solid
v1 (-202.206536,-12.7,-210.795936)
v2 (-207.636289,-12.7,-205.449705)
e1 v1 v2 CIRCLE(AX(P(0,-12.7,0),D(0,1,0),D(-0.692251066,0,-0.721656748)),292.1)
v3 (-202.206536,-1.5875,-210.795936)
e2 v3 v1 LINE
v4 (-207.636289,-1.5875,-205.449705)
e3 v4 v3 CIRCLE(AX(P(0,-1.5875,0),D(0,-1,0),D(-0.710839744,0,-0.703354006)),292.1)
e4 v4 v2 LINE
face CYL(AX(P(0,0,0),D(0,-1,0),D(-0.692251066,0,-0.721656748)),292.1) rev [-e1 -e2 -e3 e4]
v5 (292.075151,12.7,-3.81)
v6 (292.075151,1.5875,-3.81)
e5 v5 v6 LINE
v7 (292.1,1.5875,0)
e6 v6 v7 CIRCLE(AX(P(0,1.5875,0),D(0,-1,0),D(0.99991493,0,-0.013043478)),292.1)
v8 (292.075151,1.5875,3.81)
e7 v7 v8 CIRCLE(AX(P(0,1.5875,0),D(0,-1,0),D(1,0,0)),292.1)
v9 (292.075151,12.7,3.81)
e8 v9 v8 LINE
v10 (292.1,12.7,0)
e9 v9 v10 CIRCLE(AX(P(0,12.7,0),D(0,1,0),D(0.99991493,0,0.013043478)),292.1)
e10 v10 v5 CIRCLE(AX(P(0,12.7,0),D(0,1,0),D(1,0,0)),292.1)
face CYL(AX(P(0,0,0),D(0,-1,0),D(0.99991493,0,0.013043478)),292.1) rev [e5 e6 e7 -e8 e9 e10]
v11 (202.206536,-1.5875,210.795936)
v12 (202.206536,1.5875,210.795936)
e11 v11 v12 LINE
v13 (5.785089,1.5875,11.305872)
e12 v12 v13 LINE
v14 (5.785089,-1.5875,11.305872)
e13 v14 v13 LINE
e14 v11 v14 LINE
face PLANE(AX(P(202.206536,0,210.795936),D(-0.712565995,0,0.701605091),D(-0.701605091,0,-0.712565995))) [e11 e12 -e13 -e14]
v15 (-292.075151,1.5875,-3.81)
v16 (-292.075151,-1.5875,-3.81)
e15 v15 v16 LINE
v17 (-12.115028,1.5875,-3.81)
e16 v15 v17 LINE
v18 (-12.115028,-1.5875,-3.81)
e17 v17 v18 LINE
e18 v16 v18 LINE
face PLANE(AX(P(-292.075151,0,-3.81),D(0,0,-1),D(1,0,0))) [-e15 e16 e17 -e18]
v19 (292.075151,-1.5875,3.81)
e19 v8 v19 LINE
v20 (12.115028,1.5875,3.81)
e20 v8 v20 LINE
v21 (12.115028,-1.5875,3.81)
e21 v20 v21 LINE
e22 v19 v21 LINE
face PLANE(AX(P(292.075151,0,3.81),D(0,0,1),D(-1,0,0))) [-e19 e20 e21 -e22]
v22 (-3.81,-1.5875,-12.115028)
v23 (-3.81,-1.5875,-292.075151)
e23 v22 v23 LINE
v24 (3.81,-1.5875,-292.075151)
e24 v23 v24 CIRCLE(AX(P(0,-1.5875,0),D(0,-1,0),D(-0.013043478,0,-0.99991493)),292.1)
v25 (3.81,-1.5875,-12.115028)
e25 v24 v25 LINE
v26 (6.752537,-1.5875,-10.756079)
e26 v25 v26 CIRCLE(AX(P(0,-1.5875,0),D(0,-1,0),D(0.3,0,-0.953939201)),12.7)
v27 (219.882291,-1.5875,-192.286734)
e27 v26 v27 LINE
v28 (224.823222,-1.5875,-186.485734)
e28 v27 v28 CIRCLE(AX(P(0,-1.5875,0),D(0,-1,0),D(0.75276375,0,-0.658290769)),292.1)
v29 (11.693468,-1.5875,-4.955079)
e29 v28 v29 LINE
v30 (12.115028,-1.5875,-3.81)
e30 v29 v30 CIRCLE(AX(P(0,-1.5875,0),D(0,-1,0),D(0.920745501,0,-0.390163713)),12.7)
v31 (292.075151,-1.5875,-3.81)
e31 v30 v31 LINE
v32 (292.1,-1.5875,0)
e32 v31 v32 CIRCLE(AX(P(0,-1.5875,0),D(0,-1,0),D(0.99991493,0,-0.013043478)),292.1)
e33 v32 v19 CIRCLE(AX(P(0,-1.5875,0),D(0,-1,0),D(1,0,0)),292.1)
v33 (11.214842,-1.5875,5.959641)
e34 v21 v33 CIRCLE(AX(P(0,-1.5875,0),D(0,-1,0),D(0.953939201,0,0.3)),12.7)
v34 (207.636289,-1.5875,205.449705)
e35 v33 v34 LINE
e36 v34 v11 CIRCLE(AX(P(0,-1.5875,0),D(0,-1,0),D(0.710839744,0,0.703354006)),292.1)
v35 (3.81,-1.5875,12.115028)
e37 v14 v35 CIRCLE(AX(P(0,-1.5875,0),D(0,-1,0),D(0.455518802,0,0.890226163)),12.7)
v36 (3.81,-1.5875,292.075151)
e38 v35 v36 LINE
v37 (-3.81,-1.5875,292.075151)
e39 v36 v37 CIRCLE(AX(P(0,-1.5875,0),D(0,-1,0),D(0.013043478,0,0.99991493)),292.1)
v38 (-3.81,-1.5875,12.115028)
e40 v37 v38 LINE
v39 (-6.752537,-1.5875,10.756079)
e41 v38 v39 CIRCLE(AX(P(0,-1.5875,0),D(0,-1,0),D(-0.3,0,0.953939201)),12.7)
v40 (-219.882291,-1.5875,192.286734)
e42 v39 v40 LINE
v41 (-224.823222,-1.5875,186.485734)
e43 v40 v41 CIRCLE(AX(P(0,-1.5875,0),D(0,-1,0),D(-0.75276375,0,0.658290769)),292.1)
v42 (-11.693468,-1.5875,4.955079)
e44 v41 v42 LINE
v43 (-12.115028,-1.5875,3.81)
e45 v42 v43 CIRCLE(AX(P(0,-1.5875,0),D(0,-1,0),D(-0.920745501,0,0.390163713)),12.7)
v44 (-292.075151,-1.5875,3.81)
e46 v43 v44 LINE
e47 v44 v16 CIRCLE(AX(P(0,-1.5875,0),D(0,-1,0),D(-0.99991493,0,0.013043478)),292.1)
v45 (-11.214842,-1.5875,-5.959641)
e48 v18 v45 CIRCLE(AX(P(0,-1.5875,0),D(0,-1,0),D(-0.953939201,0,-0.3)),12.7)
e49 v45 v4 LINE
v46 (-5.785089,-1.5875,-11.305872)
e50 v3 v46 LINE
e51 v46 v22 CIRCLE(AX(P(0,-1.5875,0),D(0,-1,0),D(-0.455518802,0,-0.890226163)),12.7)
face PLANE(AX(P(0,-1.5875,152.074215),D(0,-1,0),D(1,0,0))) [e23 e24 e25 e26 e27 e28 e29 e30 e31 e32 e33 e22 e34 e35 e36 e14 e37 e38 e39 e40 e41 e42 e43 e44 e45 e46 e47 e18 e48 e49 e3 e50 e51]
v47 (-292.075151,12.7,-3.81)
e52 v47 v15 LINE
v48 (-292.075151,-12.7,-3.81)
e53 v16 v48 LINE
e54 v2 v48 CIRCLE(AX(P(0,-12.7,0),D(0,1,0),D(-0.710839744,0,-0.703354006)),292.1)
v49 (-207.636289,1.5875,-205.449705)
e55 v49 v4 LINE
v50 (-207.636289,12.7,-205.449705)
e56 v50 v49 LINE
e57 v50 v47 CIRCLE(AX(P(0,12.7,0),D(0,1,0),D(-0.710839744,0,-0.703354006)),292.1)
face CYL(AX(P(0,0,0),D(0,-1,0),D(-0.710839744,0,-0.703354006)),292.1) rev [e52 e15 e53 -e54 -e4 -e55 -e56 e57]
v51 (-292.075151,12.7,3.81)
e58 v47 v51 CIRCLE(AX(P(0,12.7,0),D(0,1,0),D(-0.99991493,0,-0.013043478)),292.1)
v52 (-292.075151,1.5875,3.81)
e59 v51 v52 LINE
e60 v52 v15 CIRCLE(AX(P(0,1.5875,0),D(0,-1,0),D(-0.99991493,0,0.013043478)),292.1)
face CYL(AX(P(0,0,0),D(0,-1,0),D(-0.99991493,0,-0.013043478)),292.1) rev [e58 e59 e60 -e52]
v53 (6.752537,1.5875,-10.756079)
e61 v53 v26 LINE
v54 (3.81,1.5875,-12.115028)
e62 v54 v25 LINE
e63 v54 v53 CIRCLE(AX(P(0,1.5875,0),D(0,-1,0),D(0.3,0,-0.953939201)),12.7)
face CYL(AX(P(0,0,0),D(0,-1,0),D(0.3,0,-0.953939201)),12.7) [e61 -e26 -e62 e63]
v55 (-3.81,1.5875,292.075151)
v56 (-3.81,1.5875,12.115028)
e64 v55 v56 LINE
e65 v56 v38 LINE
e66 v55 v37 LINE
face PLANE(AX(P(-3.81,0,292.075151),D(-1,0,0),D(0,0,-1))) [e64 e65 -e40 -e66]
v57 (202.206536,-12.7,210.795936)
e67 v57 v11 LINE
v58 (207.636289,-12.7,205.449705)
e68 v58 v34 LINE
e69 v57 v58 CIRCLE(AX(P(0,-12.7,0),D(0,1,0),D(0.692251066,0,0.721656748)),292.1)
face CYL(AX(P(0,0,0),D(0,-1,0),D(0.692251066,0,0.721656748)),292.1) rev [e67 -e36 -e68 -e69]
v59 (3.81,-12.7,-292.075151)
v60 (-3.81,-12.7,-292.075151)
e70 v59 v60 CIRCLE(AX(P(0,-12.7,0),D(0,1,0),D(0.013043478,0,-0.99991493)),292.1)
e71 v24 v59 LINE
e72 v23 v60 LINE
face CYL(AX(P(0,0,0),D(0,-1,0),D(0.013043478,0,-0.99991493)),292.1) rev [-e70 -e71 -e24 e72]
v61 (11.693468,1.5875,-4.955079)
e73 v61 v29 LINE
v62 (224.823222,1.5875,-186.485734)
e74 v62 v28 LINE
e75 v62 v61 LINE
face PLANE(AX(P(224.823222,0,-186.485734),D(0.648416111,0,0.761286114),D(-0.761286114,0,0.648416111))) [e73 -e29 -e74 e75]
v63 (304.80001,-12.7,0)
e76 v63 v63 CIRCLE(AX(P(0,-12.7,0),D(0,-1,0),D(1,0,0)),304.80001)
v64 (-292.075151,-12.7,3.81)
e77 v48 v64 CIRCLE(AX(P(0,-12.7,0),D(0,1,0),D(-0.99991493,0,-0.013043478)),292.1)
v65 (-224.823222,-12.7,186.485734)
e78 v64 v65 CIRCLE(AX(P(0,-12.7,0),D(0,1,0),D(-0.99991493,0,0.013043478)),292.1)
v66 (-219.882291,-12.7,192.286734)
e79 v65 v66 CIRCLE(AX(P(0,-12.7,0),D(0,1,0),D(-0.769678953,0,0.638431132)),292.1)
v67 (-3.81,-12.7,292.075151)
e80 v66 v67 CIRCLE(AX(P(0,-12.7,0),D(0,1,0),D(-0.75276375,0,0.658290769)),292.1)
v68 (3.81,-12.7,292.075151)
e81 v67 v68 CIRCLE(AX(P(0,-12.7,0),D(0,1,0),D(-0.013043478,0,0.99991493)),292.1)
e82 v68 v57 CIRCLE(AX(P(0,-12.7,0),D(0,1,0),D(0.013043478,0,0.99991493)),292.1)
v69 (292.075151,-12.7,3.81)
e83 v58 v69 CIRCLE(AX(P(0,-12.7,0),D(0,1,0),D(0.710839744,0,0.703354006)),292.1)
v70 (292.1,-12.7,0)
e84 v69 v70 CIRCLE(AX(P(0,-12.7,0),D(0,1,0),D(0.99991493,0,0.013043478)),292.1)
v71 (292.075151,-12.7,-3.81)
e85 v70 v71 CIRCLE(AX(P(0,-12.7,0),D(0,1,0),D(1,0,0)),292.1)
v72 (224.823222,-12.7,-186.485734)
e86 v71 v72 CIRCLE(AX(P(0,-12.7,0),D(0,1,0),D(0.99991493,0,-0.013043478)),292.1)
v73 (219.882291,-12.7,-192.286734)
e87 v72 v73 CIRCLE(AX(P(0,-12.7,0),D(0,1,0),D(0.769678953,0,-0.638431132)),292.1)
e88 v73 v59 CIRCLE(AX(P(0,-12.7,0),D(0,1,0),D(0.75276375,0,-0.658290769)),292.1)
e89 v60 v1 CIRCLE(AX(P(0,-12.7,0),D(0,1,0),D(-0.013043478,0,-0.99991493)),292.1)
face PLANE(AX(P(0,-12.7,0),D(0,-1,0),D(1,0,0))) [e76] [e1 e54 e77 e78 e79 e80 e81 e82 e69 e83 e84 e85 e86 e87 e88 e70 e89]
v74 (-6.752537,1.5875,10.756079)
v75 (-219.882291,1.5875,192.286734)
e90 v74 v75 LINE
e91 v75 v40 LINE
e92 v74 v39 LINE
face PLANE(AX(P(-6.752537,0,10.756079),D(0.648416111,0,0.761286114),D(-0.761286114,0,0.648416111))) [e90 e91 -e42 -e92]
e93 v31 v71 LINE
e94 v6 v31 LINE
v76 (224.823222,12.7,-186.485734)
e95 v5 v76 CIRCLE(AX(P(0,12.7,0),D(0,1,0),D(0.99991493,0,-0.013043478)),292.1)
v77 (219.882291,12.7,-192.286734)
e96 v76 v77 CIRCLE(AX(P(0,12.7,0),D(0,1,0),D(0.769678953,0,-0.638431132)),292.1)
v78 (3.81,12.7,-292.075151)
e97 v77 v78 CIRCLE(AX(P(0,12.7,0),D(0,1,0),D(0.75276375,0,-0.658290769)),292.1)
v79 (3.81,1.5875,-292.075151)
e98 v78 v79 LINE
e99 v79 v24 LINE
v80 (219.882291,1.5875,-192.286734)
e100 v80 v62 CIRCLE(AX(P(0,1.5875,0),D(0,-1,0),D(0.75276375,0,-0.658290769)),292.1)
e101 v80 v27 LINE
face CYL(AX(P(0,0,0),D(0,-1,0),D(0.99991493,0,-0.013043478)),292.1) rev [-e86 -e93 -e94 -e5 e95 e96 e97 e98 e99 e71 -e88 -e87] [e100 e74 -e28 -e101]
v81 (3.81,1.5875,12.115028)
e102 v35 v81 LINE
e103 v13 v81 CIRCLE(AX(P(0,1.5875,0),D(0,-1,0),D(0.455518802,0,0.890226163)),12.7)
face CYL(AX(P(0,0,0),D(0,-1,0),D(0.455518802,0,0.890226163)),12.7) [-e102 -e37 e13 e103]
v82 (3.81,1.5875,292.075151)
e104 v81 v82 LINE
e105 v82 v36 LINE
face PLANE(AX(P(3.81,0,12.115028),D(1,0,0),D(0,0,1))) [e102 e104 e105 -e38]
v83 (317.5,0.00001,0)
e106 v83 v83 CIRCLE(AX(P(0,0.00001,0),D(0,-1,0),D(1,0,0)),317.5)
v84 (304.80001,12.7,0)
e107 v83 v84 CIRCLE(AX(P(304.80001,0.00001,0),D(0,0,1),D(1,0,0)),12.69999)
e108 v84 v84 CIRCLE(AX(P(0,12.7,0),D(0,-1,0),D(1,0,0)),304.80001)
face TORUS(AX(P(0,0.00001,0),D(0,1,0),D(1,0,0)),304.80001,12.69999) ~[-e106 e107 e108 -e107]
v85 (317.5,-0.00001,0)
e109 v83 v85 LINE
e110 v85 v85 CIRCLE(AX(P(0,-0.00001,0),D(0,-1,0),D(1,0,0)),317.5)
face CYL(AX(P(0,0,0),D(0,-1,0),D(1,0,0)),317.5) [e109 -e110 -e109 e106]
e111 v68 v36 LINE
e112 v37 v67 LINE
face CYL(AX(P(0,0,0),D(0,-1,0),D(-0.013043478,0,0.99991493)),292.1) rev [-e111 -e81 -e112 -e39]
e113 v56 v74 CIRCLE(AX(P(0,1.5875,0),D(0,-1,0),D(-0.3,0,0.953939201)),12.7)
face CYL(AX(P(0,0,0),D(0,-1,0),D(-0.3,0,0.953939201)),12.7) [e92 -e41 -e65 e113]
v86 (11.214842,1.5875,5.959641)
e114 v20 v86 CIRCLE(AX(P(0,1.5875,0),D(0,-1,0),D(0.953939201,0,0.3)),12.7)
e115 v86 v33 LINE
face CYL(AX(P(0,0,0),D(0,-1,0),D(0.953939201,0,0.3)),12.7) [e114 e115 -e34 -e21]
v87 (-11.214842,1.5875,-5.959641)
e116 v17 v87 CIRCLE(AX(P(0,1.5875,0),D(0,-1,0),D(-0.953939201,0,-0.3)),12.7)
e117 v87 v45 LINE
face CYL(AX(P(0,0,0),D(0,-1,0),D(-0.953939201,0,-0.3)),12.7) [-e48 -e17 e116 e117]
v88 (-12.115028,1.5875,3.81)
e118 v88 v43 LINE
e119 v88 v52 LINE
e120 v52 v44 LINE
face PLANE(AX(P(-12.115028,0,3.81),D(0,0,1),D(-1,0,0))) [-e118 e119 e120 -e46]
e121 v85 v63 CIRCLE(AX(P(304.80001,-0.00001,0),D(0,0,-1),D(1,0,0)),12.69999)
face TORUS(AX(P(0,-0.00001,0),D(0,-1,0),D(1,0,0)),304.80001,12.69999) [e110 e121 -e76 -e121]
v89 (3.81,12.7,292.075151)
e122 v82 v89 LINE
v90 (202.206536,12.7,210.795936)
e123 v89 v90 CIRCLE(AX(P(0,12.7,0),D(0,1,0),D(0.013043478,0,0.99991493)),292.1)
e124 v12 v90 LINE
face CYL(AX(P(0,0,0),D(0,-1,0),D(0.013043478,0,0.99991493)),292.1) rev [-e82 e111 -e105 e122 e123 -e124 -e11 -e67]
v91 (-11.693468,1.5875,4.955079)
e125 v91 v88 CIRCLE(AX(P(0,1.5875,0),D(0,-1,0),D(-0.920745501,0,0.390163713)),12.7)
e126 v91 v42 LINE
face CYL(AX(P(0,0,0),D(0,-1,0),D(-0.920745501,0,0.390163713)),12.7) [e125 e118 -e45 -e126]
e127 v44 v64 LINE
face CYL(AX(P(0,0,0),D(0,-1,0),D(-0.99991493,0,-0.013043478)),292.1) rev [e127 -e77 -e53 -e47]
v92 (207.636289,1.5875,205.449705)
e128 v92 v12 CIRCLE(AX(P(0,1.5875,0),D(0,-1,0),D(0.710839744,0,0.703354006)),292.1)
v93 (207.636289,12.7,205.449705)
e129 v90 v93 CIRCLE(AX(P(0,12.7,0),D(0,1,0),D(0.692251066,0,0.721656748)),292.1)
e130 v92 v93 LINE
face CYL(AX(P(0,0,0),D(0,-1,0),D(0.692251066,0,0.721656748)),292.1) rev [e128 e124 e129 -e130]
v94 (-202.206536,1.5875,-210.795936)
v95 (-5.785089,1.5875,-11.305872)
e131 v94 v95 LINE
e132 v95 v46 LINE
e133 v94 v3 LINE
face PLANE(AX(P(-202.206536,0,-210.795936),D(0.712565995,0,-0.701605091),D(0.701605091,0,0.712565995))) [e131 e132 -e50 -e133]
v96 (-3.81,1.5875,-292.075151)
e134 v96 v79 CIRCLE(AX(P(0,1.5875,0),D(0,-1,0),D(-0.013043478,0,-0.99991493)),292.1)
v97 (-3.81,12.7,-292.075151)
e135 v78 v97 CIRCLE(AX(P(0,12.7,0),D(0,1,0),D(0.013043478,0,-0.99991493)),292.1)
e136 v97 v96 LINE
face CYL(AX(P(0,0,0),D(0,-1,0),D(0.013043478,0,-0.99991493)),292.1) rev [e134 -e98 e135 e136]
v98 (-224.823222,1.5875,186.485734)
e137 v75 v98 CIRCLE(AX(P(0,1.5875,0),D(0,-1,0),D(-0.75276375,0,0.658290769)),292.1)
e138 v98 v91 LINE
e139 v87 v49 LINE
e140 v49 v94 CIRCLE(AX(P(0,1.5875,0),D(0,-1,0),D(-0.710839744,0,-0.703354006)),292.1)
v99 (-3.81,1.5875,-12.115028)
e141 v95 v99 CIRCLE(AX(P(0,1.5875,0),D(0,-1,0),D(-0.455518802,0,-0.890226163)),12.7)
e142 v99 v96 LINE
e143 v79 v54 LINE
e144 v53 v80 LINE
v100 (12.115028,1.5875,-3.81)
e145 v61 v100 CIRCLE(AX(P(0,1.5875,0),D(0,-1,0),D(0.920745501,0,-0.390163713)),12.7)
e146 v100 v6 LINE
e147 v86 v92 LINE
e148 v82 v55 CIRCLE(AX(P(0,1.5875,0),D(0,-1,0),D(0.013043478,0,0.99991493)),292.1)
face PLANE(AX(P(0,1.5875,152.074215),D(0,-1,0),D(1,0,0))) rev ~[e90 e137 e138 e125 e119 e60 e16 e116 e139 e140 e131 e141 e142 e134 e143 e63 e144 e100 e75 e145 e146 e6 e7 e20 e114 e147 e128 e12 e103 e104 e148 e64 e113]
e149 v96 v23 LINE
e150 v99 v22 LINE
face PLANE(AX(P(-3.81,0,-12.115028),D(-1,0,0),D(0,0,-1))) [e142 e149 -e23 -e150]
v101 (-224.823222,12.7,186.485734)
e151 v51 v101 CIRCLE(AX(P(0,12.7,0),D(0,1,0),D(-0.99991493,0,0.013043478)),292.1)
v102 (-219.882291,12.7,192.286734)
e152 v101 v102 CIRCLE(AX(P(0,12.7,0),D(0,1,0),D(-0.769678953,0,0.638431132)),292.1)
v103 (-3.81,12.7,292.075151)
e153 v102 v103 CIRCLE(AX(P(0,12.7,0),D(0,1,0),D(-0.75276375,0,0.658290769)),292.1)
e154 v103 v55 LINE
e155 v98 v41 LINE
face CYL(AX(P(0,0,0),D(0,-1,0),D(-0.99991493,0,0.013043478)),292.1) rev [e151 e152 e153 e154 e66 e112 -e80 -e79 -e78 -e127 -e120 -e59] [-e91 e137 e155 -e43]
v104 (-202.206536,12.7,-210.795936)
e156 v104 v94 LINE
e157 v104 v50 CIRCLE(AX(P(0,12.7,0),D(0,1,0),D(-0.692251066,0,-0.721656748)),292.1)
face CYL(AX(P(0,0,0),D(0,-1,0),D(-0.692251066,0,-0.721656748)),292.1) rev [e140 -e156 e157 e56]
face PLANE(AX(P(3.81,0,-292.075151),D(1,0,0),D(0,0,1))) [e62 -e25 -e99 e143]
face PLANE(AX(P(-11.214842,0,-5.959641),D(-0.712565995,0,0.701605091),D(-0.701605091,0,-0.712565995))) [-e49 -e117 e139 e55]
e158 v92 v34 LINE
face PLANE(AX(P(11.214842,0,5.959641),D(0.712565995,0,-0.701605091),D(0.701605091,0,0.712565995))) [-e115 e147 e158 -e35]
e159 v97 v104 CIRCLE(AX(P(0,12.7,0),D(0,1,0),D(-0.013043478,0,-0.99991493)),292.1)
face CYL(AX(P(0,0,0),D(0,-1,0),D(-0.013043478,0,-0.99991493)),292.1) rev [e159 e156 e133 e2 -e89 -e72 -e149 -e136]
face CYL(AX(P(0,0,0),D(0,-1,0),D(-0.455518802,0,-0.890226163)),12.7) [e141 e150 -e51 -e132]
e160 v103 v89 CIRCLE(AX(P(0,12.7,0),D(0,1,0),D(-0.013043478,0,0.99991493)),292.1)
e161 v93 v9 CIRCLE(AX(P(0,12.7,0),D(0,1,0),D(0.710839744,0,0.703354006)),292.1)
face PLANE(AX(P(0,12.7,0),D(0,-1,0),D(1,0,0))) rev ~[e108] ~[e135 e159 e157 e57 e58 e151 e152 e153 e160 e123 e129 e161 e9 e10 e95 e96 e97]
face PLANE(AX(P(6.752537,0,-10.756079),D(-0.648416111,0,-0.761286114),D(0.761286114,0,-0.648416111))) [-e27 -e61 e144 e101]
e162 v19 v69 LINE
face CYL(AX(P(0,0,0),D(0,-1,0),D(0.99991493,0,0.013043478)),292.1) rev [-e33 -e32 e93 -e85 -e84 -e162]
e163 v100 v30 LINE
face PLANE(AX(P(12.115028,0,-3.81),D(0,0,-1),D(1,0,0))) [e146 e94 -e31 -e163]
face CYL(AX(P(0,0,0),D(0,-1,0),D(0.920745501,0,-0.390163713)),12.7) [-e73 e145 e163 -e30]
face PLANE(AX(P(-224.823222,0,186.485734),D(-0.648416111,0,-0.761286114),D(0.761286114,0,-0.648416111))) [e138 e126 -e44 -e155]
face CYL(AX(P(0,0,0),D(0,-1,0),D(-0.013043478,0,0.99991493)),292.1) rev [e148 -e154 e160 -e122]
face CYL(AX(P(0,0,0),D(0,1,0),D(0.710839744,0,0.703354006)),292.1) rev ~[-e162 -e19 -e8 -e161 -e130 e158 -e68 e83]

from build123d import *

# Parameters (mm, degrees)
F0_R     = 317.5
F1_DEPTH = 12.7
F2_DEPTH = 1.5875
F3_R     = 12.69999


# Not quite as in the source:
# - a fillet or chamfer is up to 0.001 mm smaller than in the source, because OpenCascade refuses the exact size


with BuildPart() as f1:
    # F0 (on Front) → F1 (new body, symmetric)
    with BuildSketch(Plane.XZ):
        Circle(F0_R)
        with BuildLine():
            ThreePointArc((207.6362893124, 205.4497051849), (269.4299975889, 112.8267982318), (292.075151117, 3.81))
            ThreePointArc((292.075151117, 3.81), (292.0937877132, 1.9050405158), (292.1, 0))
            ThreePointArc((292.1, 0), (292.0937877132, -1.9050405158), (292.075151117, -3.81))
            ThreePointArc((292.075151117, -3.81), (274.1141878064, -100.9149247795), (224.8232220619, -186.4857335607))
            ThreePointArc((224.8232220619, -186.4857335607), (222.371673788, -189.4023460697), (219.8822912949, -192.2867337465))
            ThreePointArc((219.8822912949, -192.2867337465), (122.4703733828, -265.1856286519), (3.81, -292.075151117))
            ThreePointArc((3.81, -292.075151117), (0, -292.1), (-3.81, -292.075151117))
            ThreePointArc((-3.81, -292.075151117), (-110.7351842209, -270.2963724795), (-202.2065364328, -210.7959359756))
            ThreePointArc((-202.2065364328, -210.7959359756), (-204.9388469754, -208.1405270493), (-207.6362893124, -205.4497051849))
            ThreePointArc((-207.6362893124, -205.4497051849), (-269.4299975889, -112.8267982318), (-292.075151117, -3.81))
            ThreePointArc((-292.075151117, -3.81), (-292.1, 0), (-292.075151117, 3.81))
            ThreePointArc((-292.075151117, 3.81), (-274.1141878064, 100.9149247795), (-224.8232220619, 186.4857335607))
            ThreePointArc((-224.8232220619, 186.4857335607), (-222.371673788, 189.4023460697), (-219.8822912949, 192.2867337465))
            ThreePointArc((-219.8822912949, 192.2867337465), (-122.4703733828, 265.1856286519), (-3.81, 292.075151117))
            ThreePointArc((-3.81, 292.075151117), (0, 292.1), (3.81, 292.075151117))
            ThreePointArc((3.81, 292.075151117), (110.7351842209, 270.2963724795), (202.2065364328, 210.7959359756))
            ThreePointArc((202.2065364328, 210.7959359756), (204.9388469754, 208.1405270493), (207.6362893124, 205.4497051849))
        make_face(mode=Mode.SUBTRACT)
    extrude(amount=F1_DEPTH, both=True)

    # F0 (on Front) → F2 (join, symmetric)
    with BuildSketch(Plane.XZ):
        with BuildLine():
            ThreePointArc((-3.81, 12.115027858), (0, 12.7), (3.81, 12.115027858))
            Line((3.81, 12.115027858), (3.81, 292.075151117))
            ThreePointArc((3.81, 292.075151117), (0, 292.1), (-3.81, 292.075151117))
            Line((-3.81, 292.075151117), (-3.81, 12.115027858))
        make_face()
        with BuildLine():
            ThreePointArc((-11.6934678579, 4.9550791574), (-9.668333643, 8.2348846117), (-6.7525370909, 10.7560793432))
            Line((-6.7525370909, 10.7560793432), (-219.8822912949, 192.2867337465))
            ThreePointArc((-219.8822912949, 192.2867337465), (-222.371673788, 189.4023460697), (-224.8232220619, 186.4857335607))
            Line((-224.8232220619, 186.4857335607), (-11.6934678579, 4.9550791574))
        make_face()
        with BuildLine():
            ThreePointArc((5.7850887786, 11.3058722717), (8.9103846511, 9.0495881326), (11.2148416582, 5.959641481))
            Line((11.2148416582, 5.959641481), (207.6362893124, 205.4497051849))
            ThreePointArc((207.6362893124, 205.4497051849), (204.9388469754, 208.1405270493), (202.2065364328, 210.7959359756))
            Line((202.2065364328, 210.7959359756), (5.7850887786, 11.3058722717))
        make_face()
        with BuildLine():
            ThreePointArc((12.115027858, 3.81), (12.5529051179, 1.9273227809), (12.7, 0))
            ThreePointArc((12.7, 0), (12.5529051179, -1.9273227809), (12.115027858, -3.81))
            Line((12.115027858, -3.81), (292.075151117, -3.81))
            ThreePointArc((292.075151117, -3.81), (292.0937877132, -1.9050405158), (292.1, 0))
            ThreePointArc((292.1, 0), (292.0937877132, 1.9050405158), (292.075151117, 3.81))
            Line((292.075151117, 3.81), (12.115027858, 3.81))
        make_face()
        with BuildLine():
            Line((224.8232220619, -186.4857335607), (11.6934678579, -4.9550791574))
            ThreePointArc((11.6934678579, -4.9550791574), (9.668333643, -8.2348846117), (6.7525370909, -10.7560793432))
            Line((6.7525370909, -10.7560793432), (219.8822912949, -192.2867337465))
            ThreePointArc((219.8822912949, -192.2867337465), (222.371673788, -189.4023460697), (224.8232220619, -186.4857335607))
        make_face()
        with BuildLine():
            Line((3.81, -292.075151117), (3.81, -12.115027858))
            ThreePointArc((3.81, -12.115027858), (0, -12.7), (-3.81, -12.115027858))
            Line((-3.81, -12.115027858), (-3.81, -292.075151117))
            ThreePointArc((-3.81, -292.075151117), (0, -292.1), (3.81, -292.075151117))
        make_face()
        with BuildLine():
            ThreePointArc((-12.115027858, -3.81), (-12.7, 0), (-12.115027858, 3.81))
            Line((-12.115027858, 3.81), (-292.075151117, 3.81))
            ThreePointArc((-292.075151117, 3.81), (-292.1, 0), (-292.075151117, -3.81))
            Line((-292.075151117, -3.81), (-12.115027858, -3.81))
        make_face()
        with BuildLine():
            Line((-202.2065364328, -210.7959359756), (-5.7850887786, -11.3058722717))
            ThreePointArc((-5.7850887786, -11.3058722717), (-8.9103846511, -9.0495881326), (-11.2148416582, -5.959641481))
            Line((-11.2148416582, -5.959641481), (-207.6362893124, -205.4497051849))
            ThreePointArc((-207.6362893124, -205.4497051849), (-204.9388469754, -208.1405270493), (-202.2065364328, -210.7959359756))
        make_face()
        with BuildLine():
            ThreePointArc((12.115027858, -3.81), (12.5529051179, -1.9273227809), (12.7, 0))
            ThreePointArc((12.7, 0), (12.5529051179, 1.9273227809), (12.115027858, 3.81))
            ThreePointArc((12.115027858, 3.81), (11.7143477213, 4.9055129666), (11.2148416582, 5.959641481))
            ThreePointArc((11.2148416582, 5.959641481), (8.9103846511, 9.0495881326), (5.7850887786, 11.3058722717))
            ThreePointArc((5.7850887786, 11.3058722717), (4.814573227, 11.7520161948), (3.81, 12.115027858))
            ThreePointArc((3.81, 12.115027858), (0, 12.7), (-3.81, 12.115027858))
            ThreePointArc((-3.81, 12.115027858), (-5.3247988427, 11.5298099414), (-6.7525370909, 10.7560793432))
            ThreePointArc((-6.7525370909, 10.7560793432), (-9.668333643, 8.2348846117), (-11.6934678579, 4.9550791574))
            ThreePointArc((-11.6934678579, 4.9550791574), (-11.9180081655, 4.3876054252), (-12.115027858, 3.81))
            ThreePointArc((-12.115027858, 3.81), (-12.7, 0), (-12.115027858, -3.81))
            ThreePointArc((-12.115027858, -3.81), (-11.7143477213, -4.9055129666), (-11.2148416582, -5.959641481))
            ThreePointArc((-11.2148416582, -5.959641481), (-8.9103846511, -9.0495881326), (-5.7850887786, -11.3058722717))
            ThreePointArc((-5.7850887786, -11.3058722717), (-4.814573227, -11.7520161948), (-3.81, -12.115027858))
            ThreePointArc((-3.81, -12.115027858), (0, -12.7), (3.81, -12.115027858))
            ThreePointArc((3.81, -12.115027858), (5.3247988427, -11.5298099414), (6.7525370909, -10.7560793432))
            ThreePointArc((6.7525370909, -10.7560793432), (9.668333643, -8.2348846117), (11.6934678579, -4.9550791574))
            ThreePointArc((11.6934678579, -4.9550791574), (11.9180081655, -4.3876054252), (12.115027858, -3.81))
        make_face()
    extrude(amount=F2_DEPTH, both=True)

    # F3 (radius 12.7 in the source; OpenCascade refuses exactly that, so slightly less here)
    f3_edges = [f1.edges().sort_by_distance(p)[0] for p in [
        (-317.5, -12.7, 0),
        (-317.5, 12.7, 0),
    ]]
    fillet(f3_edges, radius=F3_R)


solid = f1.part
